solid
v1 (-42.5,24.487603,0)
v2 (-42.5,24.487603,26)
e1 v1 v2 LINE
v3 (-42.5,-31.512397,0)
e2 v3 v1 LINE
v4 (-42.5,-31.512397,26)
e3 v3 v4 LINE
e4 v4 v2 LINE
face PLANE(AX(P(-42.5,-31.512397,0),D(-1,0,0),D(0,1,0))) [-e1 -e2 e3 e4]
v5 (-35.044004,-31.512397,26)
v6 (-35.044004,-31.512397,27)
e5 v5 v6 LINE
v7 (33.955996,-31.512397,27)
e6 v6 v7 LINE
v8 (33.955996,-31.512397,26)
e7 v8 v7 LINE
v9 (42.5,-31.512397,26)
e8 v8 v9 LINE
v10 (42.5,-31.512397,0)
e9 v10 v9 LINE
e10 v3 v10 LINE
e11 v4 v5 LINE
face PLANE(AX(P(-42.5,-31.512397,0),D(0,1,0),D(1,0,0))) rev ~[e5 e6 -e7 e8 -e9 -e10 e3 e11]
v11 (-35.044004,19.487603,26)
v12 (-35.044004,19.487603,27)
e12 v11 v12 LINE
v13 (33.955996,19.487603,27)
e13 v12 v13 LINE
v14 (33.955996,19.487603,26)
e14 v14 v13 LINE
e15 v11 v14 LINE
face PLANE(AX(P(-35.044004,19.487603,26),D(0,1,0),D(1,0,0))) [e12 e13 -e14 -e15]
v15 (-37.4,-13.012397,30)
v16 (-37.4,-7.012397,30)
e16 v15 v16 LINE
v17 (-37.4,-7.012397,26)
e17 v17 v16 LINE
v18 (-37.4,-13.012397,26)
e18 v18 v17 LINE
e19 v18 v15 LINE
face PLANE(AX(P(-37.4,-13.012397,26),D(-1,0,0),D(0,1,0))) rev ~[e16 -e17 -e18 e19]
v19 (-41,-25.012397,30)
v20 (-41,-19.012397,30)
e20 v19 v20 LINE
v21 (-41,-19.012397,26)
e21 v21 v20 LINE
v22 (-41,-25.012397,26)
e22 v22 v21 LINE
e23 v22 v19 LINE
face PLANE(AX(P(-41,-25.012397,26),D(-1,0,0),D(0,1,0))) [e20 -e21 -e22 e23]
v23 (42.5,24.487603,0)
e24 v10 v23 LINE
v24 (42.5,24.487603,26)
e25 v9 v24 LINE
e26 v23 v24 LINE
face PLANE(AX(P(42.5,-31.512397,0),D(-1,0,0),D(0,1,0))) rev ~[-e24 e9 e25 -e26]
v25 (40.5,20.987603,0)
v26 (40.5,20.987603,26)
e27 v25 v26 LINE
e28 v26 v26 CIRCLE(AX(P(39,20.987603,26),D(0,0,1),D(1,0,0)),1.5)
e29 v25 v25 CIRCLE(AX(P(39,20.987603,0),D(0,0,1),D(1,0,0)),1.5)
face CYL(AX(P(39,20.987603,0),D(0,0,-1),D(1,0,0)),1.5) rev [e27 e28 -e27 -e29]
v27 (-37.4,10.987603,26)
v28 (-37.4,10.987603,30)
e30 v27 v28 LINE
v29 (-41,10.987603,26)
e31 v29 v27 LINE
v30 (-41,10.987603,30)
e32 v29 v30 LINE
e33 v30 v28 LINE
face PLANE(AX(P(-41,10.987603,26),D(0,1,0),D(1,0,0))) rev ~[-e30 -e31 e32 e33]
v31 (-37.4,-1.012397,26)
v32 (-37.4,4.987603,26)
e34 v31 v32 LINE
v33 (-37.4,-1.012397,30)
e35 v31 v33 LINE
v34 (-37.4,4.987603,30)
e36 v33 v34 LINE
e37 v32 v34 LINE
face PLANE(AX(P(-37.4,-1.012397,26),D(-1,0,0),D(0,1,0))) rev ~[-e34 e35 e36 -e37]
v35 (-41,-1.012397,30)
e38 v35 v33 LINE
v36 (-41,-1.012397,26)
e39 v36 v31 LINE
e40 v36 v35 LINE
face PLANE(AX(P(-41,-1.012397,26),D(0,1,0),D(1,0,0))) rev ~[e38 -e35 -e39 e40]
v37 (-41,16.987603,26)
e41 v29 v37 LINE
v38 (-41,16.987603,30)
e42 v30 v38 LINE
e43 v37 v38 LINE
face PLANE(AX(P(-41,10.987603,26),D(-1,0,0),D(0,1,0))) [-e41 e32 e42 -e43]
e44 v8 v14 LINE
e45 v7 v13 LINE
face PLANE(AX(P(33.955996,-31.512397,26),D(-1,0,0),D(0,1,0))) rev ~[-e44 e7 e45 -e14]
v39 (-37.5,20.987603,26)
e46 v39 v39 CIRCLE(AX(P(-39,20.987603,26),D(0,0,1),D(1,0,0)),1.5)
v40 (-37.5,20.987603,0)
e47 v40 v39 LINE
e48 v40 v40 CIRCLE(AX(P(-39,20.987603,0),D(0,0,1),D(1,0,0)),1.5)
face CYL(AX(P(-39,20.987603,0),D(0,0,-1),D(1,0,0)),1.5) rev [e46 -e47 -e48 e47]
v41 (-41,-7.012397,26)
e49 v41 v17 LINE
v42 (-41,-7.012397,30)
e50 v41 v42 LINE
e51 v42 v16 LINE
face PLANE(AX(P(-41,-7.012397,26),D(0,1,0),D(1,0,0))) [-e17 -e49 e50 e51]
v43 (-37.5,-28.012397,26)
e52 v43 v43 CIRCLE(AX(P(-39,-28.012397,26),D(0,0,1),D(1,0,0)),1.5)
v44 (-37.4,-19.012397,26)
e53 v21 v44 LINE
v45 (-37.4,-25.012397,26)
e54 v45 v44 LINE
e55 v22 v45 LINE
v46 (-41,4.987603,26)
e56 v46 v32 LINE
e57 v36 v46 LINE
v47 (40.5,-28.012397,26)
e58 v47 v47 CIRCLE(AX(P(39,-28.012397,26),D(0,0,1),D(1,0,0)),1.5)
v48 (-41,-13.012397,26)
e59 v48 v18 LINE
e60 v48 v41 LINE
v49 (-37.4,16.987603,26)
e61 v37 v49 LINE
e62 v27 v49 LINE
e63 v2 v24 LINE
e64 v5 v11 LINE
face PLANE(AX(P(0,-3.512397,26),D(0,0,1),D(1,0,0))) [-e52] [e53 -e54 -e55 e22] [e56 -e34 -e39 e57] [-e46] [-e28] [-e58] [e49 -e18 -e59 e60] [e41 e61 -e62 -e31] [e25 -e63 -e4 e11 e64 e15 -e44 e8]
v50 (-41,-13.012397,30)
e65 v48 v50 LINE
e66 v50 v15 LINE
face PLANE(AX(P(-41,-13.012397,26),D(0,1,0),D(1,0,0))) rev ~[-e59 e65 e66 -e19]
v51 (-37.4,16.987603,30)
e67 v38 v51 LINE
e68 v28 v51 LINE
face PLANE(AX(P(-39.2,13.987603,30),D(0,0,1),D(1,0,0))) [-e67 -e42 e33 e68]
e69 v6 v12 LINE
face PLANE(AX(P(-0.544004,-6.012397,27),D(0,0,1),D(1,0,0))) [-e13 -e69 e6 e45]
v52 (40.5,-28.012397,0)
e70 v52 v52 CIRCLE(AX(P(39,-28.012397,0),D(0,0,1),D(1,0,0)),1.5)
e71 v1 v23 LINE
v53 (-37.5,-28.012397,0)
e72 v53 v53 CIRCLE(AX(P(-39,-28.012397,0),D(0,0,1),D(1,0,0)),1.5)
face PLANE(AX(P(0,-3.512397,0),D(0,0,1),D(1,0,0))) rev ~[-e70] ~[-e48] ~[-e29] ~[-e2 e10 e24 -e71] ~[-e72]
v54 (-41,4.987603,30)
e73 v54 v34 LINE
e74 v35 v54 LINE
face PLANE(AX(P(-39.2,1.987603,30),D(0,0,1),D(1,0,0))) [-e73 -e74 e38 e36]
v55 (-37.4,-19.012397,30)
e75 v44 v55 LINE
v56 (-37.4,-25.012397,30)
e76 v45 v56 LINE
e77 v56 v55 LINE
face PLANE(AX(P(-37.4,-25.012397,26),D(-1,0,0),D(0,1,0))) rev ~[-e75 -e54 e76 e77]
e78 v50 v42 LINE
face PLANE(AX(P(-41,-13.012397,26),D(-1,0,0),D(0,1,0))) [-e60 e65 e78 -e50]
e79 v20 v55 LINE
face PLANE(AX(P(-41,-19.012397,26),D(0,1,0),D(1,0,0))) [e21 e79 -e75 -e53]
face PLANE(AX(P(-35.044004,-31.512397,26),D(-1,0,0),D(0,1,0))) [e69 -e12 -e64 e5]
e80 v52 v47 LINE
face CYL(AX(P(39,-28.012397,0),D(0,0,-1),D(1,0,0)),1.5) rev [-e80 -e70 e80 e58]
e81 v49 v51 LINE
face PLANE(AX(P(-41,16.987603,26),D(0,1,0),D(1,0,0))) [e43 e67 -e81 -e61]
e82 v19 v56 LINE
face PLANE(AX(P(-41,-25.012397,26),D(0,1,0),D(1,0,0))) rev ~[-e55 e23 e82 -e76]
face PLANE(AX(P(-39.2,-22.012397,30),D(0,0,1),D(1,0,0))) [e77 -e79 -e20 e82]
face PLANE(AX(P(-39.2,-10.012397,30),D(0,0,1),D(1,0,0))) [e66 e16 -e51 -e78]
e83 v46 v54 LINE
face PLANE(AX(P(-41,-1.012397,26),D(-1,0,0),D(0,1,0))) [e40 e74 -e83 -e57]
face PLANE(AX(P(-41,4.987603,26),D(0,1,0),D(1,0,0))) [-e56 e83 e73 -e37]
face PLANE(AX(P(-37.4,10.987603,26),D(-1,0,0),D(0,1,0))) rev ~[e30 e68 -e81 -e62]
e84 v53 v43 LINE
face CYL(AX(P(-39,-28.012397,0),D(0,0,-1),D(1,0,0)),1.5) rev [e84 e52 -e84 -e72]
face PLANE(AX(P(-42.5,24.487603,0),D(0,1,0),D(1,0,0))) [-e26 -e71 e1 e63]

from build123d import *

# Parameters (mm, degrees)
F0_W     = 85
F0_H     = 56
F0_R     = 1.5
F1_DEPTH = 26
F2_W     = 69
F2_H     = 51
F3_DEPTH = 1
F4_W     = 3.6
F4_H     = 6
F5_DEPTH = 4


with BuildPart() as f1:
    # F0 (on Top) → F1 (new body)
    with BuildSketch(Plane.XY):
        with Locations((0, -3.51239704)):
            Rectangle(F0_W, F0_H)
        with Locations((-39, -28.01239704)):
            Circle(F0_R, mode=Mode.SUBTRACT)
        with Locations((39, -28.01239704)):
            Circle(F0_R, mode=Mode.SUBTRACT)
        with Locations((-39, 20.98760296)):
            Circle(F0_R, mode=Mode.SUBTRACT)
        with Locations((39, 20.98760296)):
            Circle(F0_R, mode=Mode.SUBTRACT)
    extrude(amount=F1_DEPTH)

    # F2 (on face) → F3 (join)
    with BuildSketch(Plane.XY.offset(26)):
        with Locations((-0.5440037453, -6.01239704)):
            Rectangle(F2_W, F2_H)
    extrude(amount=F3_DEPTH)

    # F4 (on face) → F5 (join)
    with BuildSketch(Plane.XY.offset(26)):
        with Locations((-39.2, 13.98760296)):
            Rectangle(F4_W, F4_H)
        with Locations((-39.2, 1.98760296)):
            Rectangle(F4_W, F4_H)
        with Locations((-39.2, -10.01239704)):
            Rectangle(F4_W, F4_H)
        with Locations((-39.2, -22.01239704)):
            Rectangle(F4_W, F4_H)
    extrude(amount=F5_DEPTH)


solid = f1.part
